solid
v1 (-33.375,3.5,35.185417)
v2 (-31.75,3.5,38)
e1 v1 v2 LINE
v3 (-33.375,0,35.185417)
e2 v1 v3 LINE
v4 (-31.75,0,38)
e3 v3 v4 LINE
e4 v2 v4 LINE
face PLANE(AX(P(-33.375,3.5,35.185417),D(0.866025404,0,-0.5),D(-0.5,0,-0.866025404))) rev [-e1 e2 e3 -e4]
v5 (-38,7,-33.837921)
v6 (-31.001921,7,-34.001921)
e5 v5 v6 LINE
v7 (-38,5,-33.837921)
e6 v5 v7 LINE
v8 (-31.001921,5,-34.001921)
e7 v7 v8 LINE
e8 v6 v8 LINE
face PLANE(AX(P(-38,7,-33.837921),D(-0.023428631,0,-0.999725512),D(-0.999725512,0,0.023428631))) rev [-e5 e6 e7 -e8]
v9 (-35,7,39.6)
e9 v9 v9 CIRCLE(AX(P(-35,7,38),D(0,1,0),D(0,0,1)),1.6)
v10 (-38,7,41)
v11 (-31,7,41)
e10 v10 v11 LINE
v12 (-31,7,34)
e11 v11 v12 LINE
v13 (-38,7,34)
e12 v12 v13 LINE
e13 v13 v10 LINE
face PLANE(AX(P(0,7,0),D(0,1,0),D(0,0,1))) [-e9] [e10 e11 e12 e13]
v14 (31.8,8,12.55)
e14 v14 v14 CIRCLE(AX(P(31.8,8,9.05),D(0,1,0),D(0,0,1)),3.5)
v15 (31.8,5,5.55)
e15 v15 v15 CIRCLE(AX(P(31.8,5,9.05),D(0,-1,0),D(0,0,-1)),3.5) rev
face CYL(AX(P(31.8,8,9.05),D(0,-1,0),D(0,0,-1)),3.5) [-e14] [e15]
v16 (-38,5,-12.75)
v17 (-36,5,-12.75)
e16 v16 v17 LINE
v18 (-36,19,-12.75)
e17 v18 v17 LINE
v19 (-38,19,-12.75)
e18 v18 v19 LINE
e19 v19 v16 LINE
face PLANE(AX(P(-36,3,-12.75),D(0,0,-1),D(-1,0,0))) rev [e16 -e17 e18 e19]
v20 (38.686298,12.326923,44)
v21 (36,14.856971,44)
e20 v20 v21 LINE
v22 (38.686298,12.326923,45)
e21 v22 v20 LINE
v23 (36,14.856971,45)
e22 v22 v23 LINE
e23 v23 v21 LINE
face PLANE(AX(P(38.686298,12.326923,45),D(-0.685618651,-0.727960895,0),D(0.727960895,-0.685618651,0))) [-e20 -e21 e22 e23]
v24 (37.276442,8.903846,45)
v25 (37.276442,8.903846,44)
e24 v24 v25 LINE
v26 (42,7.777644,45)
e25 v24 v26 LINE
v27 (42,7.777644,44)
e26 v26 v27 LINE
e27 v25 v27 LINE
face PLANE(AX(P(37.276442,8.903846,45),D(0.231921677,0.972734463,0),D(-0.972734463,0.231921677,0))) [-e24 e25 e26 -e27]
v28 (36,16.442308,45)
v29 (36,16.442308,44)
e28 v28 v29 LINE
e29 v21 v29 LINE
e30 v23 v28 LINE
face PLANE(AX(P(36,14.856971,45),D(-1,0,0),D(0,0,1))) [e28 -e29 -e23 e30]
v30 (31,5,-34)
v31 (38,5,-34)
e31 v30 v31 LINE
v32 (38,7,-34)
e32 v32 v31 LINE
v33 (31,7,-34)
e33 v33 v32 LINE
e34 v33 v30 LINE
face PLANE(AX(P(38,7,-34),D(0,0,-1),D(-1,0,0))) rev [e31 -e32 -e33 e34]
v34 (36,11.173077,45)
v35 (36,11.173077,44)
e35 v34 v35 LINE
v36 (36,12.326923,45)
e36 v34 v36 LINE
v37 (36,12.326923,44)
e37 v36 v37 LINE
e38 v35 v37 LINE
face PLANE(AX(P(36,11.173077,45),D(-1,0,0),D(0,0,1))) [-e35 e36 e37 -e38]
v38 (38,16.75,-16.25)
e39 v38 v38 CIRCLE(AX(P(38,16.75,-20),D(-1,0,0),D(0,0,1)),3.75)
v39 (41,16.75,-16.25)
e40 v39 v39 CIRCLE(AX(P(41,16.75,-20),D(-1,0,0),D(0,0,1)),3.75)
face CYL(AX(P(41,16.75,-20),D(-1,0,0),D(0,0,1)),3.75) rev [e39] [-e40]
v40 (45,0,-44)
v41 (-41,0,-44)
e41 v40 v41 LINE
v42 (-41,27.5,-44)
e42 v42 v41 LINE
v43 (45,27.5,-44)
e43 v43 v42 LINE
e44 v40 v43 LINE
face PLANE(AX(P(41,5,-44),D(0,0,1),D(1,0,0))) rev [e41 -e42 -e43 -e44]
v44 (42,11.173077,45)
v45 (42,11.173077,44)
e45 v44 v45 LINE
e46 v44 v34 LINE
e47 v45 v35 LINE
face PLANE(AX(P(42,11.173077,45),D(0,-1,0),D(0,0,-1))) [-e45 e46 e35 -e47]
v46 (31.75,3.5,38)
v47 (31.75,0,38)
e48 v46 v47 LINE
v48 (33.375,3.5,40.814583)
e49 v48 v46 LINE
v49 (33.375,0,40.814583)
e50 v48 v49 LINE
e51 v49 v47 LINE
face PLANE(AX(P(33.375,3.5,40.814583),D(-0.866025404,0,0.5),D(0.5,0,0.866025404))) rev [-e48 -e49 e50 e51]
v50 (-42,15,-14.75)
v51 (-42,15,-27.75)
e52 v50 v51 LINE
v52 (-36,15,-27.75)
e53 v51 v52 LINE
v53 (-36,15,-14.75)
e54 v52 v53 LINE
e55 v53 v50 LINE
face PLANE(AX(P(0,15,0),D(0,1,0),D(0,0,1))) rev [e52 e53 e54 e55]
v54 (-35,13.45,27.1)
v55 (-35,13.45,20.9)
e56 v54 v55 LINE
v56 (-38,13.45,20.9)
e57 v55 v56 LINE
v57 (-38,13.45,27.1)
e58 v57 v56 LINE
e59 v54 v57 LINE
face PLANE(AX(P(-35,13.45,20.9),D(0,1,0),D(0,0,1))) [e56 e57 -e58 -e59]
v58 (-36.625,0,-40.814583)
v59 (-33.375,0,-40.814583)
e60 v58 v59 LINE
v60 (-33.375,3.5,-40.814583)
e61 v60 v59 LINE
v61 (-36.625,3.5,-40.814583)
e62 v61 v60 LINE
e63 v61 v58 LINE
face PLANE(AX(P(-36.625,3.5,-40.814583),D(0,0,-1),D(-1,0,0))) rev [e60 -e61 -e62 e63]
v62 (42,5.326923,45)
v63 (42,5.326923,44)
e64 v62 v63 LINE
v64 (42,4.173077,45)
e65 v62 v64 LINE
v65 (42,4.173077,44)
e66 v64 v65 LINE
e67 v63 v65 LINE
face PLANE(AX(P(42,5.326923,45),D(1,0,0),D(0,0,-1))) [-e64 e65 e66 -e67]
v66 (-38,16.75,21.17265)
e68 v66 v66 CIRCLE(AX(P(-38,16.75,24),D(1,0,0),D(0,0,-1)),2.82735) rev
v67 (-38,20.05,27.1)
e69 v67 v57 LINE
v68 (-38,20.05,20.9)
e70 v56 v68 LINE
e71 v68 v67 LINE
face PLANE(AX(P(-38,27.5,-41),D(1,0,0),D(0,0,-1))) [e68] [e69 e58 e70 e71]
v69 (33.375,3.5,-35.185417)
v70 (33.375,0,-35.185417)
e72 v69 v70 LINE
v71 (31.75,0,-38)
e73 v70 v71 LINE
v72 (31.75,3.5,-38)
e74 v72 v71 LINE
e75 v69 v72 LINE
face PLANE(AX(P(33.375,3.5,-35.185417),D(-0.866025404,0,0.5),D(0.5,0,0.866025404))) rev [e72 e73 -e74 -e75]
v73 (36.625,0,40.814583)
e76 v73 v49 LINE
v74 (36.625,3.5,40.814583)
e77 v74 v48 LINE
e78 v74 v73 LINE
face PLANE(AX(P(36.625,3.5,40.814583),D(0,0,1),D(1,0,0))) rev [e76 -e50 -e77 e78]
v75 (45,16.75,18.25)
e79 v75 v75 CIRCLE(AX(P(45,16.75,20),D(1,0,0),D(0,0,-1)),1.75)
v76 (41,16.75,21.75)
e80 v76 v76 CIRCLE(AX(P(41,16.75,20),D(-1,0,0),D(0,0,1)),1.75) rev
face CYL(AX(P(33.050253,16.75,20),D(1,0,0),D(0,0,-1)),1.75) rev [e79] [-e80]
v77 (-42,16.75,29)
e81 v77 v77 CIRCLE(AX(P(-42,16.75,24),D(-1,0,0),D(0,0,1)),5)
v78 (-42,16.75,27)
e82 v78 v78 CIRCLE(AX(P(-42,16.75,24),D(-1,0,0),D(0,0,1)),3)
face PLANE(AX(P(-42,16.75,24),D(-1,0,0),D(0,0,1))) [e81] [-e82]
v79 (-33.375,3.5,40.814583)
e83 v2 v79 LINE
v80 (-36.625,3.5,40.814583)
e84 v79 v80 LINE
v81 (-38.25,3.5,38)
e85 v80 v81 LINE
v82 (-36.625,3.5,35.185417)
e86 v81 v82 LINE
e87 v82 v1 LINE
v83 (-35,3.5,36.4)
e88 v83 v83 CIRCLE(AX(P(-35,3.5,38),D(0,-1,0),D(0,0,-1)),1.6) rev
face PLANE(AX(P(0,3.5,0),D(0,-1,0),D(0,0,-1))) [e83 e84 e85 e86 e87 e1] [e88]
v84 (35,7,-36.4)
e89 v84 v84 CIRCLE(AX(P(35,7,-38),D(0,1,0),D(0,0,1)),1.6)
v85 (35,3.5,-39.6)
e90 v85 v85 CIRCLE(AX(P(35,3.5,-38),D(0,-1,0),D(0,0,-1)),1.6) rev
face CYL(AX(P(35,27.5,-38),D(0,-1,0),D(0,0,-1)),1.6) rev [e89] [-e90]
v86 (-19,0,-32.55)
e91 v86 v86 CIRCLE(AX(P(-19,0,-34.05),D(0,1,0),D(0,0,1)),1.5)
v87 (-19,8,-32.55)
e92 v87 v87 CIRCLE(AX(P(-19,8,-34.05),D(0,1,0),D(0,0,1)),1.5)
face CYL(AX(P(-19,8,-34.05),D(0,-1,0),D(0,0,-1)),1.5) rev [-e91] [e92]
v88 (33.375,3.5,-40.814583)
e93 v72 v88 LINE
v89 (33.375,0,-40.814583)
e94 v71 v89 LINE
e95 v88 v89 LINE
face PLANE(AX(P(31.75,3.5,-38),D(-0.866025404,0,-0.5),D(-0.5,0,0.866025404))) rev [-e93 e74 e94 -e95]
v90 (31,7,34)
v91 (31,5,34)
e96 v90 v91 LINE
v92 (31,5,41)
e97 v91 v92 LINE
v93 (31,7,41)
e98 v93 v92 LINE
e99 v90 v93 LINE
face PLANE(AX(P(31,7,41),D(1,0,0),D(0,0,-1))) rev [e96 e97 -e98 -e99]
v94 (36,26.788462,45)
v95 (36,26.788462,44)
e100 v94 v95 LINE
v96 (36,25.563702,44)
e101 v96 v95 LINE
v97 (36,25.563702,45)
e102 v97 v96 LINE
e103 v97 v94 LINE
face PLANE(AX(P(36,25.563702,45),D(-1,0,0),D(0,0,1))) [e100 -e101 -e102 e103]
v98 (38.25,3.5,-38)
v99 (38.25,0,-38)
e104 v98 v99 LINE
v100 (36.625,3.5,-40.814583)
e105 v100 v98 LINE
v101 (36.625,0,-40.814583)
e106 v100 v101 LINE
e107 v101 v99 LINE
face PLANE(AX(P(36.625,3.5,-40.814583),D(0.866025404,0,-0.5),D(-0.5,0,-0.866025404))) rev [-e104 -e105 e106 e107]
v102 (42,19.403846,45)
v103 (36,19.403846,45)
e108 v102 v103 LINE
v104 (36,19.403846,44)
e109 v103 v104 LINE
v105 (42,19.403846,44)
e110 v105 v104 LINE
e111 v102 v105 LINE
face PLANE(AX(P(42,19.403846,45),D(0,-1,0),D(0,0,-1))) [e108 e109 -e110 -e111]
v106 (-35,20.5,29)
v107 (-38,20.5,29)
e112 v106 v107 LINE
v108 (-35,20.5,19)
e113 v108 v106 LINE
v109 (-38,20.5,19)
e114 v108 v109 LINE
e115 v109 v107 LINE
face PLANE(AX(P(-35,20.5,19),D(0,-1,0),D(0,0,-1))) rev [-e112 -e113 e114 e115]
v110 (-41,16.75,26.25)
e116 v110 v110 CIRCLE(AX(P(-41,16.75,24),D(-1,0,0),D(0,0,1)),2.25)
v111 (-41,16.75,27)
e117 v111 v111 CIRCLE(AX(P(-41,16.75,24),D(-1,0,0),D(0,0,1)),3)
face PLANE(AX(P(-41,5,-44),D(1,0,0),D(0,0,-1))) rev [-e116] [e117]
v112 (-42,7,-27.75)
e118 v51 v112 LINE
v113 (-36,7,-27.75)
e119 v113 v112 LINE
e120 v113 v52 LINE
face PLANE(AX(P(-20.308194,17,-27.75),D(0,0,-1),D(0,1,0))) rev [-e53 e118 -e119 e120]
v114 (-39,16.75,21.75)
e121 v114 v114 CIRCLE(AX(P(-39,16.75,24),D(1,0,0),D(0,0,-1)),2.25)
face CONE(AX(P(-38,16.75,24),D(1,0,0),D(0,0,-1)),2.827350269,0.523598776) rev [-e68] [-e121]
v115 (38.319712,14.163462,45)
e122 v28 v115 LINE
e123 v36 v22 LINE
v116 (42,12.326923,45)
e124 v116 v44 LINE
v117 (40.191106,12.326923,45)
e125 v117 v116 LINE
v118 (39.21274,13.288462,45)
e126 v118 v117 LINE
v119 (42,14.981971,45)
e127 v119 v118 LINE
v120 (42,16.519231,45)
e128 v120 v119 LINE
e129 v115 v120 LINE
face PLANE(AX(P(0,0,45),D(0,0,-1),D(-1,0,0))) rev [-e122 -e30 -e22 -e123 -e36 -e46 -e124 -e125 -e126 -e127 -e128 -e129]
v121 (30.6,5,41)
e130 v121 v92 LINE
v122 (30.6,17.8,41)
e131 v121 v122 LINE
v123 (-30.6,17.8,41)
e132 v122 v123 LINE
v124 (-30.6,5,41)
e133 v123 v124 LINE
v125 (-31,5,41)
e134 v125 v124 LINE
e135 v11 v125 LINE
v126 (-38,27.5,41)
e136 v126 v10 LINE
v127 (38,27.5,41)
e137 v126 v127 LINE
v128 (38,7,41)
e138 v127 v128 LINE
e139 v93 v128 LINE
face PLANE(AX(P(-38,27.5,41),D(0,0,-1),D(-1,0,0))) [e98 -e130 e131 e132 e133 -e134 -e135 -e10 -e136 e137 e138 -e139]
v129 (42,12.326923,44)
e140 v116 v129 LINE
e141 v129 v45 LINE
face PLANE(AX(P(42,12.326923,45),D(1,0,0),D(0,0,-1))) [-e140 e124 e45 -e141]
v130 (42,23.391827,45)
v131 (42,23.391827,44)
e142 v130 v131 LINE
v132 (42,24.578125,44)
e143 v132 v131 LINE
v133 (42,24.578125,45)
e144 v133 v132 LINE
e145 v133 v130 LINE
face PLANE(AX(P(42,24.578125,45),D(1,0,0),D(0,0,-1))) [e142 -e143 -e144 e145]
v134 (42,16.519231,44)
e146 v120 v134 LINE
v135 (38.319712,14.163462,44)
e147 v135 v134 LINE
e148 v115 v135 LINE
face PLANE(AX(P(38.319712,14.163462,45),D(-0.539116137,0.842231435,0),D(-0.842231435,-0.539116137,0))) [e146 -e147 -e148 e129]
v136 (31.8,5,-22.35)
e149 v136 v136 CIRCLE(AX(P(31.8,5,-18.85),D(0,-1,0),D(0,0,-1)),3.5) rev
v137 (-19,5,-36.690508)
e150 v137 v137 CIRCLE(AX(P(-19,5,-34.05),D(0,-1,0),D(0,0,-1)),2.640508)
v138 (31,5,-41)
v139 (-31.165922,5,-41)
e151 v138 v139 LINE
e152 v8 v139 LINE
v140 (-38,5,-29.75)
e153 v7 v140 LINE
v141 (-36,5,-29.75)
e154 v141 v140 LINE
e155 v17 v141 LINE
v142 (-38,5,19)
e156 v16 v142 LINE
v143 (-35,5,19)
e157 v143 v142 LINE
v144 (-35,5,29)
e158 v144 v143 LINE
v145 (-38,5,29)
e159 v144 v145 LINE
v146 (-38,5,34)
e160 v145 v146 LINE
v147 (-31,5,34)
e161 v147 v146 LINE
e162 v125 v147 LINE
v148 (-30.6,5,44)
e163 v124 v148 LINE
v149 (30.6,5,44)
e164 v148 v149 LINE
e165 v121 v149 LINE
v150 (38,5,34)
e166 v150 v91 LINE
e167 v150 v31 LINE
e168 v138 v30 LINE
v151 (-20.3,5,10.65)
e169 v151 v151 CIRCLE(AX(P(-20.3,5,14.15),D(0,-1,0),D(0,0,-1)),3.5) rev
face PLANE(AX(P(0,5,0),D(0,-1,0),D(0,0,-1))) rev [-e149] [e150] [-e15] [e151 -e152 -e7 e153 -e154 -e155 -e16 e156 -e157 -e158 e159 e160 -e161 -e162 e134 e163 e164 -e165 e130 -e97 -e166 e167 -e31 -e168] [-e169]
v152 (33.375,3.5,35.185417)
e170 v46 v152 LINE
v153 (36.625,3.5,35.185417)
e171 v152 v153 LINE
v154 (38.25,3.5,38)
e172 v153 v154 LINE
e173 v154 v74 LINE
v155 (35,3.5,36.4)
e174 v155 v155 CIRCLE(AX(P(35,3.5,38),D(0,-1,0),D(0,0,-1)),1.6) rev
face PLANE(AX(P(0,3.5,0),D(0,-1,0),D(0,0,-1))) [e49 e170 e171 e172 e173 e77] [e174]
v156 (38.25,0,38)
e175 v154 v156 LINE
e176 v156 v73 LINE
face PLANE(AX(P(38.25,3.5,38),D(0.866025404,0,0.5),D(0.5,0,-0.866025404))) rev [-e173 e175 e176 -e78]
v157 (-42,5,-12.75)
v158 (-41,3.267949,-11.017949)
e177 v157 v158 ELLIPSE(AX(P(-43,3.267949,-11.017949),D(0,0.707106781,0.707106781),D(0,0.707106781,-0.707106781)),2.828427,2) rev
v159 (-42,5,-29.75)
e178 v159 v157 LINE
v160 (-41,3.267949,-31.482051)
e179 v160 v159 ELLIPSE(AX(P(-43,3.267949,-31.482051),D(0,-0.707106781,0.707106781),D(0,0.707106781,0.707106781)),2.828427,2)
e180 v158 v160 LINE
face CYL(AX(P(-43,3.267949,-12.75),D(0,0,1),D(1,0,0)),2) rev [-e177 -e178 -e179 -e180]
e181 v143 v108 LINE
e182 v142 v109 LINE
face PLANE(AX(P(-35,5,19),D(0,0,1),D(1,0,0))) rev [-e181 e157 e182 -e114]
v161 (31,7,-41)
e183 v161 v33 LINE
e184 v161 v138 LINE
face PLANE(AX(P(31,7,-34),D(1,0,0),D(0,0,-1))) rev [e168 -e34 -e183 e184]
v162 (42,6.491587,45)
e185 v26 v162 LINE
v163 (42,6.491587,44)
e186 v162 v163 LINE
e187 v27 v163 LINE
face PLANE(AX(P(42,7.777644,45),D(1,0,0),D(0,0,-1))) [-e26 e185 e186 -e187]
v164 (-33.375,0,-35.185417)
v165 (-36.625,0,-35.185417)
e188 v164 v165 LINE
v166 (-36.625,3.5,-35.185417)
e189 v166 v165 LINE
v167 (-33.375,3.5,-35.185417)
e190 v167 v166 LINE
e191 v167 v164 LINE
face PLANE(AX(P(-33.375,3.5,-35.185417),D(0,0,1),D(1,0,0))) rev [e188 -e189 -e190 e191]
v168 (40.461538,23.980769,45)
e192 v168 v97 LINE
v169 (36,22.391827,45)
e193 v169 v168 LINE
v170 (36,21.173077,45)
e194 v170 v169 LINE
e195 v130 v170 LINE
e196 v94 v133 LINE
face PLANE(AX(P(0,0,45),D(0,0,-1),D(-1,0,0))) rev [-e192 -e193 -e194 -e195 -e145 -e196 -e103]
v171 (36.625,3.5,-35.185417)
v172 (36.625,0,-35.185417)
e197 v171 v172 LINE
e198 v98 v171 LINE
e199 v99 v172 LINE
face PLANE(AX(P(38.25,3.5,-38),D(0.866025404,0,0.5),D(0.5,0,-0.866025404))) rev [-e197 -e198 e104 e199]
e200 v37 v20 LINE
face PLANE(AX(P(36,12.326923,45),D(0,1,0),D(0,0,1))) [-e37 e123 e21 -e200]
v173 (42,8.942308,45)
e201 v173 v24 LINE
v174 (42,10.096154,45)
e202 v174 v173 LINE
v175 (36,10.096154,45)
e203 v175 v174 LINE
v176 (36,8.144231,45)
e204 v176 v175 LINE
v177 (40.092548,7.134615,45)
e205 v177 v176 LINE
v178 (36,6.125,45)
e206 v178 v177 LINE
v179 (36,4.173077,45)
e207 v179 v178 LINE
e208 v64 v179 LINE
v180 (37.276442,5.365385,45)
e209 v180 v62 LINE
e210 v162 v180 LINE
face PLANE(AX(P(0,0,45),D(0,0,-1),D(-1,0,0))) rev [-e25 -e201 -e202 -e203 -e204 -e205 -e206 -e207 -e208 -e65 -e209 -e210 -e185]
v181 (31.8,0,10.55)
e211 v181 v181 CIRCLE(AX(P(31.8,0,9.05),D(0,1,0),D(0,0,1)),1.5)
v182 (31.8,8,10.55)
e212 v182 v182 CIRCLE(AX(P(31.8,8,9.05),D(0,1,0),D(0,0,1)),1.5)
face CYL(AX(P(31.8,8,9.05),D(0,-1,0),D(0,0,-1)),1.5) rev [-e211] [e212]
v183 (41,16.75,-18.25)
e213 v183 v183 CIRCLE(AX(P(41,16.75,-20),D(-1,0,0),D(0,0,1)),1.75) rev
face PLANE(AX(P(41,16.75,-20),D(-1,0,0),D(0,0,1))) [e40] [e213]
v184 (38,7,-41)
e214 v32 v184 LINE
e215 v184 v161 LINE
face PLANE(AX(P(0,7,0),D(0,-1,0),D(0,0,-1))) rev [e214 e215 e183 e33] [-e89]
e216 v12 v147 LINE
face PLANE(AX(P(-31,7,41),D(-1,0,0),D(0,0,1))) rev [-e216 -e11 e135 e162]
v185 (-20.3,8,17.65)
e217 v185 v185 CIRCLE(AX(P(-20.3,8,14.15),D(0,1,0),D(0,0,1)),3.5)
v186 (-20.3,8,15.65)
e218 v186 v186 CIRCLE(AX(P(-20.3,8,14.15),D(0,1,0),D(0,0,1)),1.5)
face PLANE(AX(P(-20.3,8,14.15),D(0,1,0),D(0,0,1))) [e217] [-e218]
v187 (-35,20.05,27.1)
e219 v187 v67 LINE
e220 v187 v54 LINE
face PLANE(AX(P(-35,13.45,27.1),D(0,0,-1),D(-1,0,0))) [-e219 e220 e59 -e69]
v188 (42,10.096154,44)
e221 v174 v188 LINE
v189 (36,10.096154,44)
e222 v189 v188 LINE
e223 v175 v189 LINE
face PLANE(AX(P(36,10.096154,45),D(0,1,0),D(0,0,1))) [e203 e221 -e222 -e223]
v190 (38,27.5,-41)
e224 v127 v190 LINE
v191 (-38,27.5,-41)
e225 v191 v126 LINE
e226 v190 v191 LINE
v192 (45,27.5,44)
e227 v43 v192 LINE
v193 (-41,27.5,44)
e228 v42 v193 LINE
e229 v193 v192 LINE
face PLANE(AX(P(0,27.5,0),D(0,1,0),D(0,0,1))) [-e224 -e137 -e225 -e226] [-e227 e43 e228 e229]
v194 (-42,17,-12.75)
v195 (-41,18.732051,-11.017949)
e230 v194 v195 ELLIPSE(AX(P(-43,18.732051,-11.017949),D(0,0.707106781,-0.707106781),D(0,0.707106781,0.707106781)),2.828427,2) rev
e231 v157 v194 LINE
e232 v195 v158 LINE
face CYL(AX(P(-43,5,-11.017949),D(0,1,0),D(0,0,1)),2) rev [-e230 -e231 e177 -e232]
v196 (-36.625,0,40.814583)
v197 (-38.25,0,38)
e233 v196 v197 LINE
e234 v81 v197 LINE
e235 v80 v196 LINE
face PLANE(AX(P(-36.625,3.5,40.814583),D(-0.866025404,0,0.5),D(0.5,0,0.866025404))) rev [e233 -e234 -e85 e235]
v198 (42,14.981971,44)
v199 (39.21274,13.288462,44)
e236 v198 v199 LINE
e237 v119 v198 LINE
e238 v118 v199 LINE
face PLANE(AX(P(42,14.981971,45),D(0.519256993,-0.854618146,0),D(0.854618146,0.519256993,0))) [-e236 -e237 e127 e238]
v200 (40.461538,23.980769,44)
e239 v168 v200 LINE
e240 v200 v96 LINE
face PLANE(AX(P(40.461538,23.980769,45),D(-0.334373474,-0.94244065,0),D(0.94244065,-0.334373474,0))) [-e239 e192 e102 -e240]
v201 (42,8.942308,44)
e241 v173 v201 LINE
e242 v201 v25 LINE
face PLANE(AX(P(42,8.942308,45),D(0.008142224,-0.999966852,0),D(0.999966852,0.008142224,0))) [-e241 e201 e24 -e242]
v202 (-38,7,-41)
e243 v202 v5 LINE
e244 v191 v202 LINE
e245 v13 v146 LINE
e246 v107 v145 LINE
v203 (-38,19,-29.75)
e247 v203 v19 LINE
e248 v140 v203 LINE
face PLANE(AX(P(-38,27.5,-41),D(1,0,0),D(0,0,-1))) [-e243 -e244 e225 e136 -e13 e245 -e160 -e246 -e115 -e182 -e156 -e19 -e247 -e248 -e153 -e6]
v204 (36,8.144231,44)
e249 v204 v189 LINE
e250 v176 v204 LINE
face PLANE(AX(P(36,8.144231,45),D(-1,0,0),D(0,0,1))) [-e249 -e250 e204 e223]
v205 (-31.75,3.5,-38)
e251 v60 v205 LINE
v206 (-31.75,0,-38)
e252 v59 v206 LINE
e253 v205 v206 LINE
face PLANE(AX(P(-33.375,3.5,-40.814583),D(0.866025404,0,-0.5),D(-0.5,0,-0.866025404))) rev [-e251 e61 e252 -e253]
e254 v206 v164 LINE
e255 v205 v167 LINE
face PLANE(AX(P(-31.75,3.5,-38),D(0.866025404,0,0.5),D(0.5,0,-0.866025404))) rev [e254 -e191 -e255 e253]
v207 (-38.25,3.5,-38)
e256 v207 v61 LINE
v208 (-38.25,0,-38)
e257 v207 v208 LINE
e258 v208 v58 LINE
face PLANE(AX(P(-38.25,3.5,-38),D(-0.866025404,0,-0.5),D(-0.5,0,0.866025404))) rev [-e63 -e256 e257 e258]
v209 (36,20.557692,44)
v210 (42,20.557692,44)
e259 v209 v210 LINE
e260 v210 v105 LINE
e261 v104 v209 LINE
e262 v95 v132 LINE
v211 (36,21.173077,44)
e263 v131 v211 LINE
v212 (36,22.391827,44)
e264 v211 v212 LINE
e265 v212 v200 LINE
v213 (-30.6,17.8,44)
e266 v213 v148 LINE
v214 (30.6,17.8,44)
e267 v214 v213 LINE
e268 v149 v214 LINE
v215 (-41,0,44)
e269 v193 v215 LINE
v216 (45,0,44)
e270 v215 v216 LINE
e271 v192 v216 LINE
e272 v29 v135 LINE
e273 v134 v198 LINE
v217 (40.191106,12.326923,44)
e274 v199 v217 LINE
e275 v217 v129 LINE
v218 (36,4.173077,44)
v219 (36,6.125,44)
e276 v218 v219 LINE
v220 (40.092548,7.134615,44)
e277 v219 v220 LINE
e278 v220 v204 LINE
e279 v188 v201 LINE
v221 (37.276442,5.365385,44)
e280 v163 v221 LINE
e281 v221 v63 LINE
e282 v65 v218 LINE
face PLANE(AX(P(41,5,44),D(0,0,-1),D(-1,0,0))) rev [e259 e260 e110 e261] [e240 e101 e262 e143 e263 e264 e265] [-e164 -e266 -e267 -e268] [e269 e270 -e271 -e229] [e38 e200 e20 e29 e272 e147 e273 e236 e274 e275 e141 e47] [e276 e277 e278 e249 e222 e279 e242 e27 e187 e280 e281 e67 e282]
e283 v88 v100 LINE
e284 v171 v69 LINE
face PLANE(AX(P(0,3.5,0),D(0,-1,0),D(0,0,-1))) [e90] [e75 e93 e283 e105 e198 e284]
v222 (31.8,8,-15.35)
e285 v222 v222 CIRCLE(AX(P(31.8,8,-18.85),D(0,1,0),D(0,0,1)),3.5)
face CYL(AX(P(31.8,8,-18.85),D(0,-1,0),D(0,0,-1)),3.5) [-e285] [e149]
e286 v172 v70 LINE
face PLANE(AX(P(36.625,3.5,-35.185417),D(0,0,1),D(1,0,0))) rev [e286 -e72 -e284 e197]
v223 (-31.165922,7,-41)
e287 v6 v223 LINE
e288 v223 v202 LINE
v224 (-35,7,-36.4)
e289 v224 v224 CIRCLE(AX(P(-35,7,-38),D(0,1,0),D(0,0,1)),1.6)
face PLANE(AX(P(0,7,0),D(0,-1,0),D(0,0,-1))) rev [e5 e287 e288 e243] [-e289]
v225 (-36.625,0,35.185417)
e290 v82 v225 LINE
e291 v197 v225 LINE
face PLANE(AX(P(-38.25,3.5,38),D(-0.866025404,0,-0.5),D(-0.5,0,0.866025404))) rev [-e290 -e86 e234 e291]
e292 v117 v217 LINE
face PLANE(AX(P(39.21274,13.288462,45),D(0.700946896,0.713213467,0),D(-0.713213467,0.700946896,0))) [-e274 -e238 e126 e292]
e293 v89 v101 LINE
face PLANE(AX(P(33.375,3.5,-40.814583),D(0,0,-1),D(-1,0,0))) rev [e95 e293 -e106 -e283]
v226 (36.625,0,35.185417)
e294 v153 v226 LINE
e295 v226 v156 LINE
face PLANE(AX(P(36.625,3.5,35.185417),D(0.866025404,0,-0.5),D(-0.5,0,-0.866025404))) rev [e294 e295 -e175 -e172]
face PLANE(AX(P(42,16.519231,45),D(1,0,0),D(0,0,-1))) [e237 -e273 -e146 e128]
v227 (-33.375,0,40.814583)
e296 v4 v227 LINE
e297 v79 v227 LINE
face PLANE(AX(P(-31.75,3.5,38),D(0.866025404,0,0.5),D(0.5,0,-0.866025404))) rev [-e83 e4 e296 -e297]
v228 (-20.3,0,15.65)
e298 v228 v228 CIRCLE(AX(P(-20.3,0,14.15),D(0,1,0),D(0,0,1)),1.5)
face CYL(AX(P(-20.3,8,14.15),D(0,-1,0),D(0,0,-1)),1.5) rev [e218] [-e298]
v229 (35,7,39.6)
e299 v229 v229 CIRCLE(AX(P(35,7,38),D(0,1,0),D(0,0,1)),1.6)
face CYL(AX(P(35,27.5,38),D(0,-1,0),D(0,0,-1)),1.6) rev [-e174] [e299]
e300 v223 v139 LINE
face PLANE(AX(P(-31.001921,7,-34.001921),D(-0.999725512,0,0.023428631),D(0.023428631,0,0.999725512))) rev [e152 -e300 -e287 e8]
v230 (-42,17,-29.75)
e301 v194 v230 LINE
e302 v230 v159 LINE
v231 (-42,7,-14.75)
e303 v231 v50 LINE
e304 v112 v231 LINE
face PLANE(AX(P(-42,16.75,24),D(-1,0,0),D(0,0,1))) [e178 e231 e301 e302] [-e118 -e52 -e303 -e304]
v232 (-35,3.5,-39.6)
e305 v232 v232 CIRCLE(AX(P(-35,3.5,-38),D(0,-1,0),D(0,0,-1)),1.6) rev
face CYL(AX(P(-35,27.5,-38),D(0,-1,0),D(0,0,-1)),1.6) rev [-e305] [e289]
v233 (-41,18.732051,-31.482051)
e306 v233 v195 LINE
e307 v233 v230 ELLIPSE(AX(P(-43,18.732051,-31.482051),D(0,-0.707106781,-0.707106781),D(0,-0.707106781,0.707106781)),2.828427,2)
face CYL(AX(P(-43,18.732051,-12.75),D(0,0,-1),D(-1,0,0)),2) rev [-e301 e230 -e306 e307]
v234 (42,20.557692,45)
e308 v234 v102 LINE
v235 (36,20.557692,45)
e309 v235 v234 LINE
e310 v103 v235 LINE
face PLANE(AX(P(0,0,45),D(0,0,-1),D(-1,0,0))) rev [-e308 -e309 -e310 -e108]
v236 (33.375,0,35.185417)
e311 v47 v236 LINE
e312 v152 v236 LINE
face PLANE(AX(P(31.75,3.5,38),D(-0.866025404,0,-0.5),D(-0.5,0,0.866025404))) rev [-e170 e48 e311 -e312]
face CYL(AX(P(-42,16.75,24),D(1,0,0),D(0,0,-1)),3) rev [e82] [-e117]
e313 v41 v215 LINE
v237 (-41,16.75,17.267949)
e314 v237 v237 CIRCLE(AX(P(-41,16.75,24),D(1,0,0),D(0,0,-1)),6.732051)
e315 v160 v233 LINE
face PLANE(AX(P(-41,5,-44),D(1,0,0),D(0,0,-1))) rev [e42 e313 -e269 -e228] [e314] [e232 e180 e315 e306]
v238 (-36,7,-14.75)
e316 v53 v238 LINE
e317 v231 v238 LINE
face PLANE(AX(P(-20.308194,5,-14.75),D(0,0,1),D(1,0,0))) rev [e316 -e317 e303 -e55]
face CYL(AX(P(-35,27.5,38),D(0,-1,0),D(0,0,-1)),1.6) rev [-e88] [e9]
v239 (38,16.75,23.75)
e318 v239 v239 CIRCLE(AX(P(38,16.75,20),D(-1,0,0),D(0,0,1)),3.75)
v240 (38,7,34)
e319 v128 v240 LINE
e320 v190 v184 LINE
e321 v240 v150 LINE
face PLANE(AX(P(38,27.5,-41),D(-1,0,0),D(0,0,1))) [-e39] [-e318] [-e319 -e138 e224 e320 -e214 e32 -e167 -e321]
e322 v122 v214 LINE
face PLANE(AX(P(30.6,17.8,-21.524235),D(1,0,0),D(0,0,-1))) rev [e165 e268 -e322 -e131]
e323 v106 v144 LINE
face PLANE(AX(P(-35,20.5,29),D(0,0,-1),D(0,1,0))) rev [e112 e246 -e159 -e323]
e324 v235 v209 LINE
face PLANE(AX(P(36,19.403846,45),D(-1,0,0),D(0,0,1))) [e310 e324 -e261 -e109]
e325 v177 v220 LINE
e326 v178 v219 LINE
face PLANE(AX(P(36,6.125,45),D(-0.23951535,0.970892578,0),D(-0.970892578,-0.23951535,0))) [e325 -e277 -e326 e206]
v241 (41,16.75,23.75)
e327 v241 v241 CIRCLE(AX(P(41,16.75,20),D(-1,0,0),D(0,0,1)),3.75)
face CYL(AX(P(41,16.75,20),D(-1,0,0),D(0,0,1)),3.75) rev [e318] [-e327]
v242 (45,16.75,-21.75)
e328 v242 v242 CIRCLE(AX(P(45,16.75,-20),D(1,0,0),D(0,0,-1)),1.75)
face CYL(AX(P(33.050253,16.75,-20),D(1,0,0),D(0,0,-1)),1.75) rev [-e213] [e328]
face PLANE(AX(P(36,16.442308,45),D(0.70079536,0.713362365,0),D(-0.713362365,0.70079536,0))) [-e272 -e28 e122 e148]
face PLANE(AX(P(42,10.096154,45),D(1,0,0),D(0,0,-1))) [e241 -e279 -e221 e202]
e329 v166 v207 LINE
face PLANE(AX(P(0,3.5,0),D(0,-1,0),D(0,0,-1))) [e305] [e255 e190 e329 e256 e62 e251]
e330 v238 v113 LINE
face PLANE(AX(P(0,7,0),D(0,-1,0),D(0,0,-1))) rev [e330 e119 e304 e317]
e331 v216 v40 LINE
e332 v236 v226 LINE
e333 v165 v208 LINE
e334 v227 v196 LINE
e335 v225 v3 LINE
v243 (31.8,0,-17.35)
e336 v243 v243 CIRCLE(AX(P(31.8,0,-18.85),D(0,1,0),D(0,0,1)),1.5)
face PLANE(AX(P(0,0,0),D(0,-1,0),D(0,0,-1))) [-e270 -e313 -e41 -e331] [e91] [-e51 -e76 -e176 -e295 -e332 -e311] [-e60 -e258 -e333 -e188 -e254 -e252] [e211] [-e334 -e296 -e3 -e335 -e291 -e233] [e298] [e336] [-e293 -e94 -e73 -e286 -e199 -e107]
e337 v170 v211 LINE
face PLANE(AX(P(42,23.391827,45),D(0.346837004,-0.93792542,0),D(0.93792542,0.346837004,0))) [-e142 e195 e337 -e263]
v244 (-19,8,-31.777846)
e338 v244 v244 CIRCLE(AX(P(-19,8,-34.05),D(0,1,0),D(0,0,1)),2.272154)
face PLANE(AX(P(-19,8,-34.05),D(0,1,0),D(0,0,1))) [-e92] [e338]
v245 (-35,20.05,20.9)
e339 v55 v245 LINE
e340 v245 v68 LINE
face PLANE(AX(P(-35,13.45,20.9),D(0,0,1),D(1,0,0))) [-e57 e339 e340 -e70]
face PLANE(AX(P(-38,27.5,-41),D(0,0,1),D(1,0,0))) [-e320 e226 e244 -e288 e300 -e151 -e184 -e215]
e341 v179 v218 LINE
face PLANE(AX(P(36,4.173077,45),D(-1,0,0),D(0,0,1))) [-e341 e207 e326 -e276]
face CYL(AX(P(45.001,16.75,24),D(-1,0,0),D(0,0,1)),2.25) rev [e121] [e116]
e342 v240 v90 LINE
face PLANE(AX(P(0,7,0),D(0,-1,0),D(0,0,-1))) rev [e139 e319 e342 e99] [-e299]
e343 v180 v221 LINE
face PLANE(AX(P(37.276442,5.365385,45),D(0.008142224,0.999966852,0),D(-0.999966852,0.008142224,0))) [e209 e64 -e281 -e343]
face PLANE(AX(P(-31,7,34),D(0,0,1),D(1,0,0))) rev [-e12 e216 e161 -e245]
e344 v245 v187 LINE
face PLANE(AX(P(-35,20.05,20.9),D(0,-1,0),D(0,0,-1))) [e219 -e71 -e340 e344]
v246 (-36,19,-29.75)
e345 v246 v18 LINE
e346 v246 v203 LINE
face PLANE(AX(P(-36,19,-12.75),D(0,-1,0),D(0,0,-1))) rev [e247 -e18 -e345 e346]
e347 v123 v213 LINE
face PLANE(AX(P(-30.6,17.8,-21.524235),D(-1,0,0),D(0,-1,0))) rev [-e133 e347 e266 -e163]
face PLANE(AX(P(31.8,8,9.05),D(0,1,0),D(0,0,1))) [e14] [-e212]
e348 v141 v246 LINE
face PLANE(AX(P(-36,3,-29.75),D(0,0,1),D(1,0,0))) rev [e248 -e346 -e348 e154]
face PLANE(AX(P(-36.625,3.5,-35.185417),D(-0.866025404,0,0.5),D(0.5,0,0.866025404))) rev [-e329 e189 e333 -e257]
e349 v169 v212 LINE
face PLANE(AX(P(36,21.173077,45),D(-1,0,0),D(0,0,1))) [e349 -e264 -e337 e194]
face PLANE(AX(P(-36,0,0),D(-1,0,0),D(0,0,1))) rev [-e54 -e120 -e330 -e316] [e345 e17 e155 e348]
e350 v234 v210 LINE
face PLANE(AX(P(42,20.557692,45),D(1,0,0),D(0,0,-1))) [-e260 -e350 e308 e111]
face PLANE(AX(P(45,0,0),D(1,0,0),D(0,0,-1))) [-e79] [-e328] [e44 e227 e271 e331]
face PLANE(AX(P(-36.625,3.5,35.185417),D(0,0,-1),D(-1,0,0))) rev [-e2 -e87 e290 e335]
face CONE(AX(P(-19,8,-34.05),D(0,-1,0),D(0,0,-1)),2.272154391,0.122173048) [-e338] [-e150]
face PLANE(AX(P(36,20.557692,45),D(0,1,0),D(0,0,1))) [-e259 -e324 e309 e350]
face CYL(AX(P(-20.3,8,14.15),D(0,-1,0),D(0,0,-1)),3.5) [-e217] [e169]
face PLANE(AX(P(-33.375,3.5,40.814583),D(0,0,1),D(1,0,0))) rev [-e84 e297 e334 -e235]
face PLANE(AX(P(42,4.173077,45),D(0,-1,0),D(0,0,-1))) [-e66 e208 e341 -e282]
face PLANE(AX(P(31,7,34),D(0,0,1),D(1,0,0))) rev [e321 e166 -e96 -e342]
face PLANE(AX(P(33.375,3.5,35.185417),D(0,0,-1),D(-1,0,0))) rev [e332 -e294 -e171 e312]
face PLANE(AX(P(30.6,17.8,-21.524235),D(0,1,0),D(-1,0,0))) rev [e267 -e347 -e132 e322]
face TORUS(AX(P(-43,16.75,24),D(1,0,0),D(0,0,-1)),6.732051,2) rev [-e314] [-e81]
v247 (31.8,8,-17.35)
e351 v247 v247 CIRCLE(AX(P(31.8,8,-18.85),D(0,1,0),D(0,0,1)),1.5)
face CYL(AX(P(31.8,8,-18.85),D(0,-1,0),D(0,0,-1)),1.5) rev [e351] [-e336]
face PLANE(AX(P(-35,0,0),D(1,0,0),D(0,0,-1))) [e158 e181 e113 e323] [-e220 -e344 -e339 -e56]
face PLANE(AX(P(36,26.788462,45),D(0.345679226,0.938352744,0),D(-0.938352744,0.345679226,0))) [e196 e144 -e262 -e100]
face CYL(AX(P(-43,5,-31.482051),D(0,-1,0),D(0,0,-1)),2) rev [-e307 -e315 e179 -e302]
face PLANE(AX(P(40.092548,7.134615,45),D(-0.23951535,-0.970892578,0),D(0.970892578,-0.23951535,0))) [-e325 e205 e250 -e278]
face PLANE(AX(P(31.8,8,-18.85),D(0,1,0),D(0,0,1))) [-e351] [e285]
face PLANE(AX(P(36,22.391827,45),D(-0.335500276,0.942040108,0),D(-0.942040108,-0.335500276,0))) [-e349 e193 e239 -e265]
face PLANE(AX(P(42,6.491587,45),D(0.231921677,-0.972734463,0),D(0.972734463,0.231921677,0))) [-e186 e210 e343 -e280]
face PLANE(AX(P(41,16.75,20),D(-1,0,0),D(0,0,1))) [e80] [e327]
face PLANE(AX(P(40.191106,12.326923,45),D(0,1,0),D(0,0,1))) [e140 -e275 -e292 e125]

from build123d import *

# Parameters (mm, degrees)
SKETCH1_W            = 82
SKETCH1_H            = 88
BOSS_EXTRUDE1_DEPTH  = 5
SKETCH2_W            = 82
SKETCH2_H            = 88
SKETCH2_W_2          = 76
SKETCH2_H_2          = 82
BOSS_EXTRUDE2_DEPTH  = 22.5
SKETCH_1_R           = 3.5
SKETCH_1_R_2         = 1.5
BOSS_EXTRUDE3_DEPTH  = 3
SKETCH4_W            = 13
SKETCH4_H            = 12
CUT_EXTRUDE1_DEPTH   = 3
SKETCH7_R            = 1.6
CUT_EXTRUDE3_DEPTH   = 67.130552697
CUT_EXTRUDE4_DEPTH   = 3.5
SKETCH10_W           = 17
SKETCH10_H           = 16
SKETCH10_W_2         = 13
SKETCH10_H_2         = 12
BOSS_EXTRUDE6_DEPTH  = 2
CHAMFER1_SIZE        = 10
CHAMFER1_SIZE_2      = 1.227845609
SKETCH11_R           = 1.5
CUT_EXTRUDE5_DEPTH   = 65.212537717
SKETCH12_W           = 61.2
SKETCH12_H           = 12.8
CUT_EXTRUDE6_DEPTH   = 3
SKETCH13_R           = 1.75
CUT_EXTRUDE7_DEPTH   = 3
BOSS_EXTRUDE7_START  = 4
SKETCH14_W           = 88
SKETCH14_H           = 27.5
SKETCH14_R           = 1.75
BOSS_EXTRUDE7_DEPTH  = 4
SKETCH15_R           = 3.75
CUT_EXTRUDE8_DEPTH   = 3
CUT_EXTRUDE9_REACH   = 102.44
SKETCH16_R           = 2.25
SKETCH17_W           = 10
SKETCH17_H           = 15.5
SKETCH17_W_2         = 6.2
SKETCH17_H_2         = 6.6
BOSS_EXTRUDE8_DEPTH  = 3
CHAMFER2_SIZE        = 1
CHAMFER2_SIZE2       = 0.577350269
SKETCH20_R           = 5
SKETCH20_R_2         = 3
BOSS_EXTRUDE10_DEPTH = 1
FILLET3_R            = 2
SKETCH21_W           = 5
SKETCH21_H           = 13
BOSS_EXTRUDE11_DEPTH = 2
SKETCH22_W           = 6
SKETCH22_H           = 1.153846154
BOSS_EXTRUDE12_DEPTH = 1
SKETCH27_W           = 5
SKETCH27_H           = 13
BOSS_EXTRUDE17_DEPTH = 2
SKETCH23_W           = 7
SKETCH23_H           = 7
SKETCH23_R           = 1.6
BOSS_EXTRUDE13_DEPTH = 2
SKETCH25_W           = 17
SKETCH25_H           = 12
SKETCH25_W_2         = 13
SKETCH25_H_2         = 8
BOSS_EXTRUDE15_DEPTH = 1
FILLET4_R            = 2


with BuildPart() as part:
    # Sketch1 → Boss-Extrude1 (new body)
    with BuildSketch(Plane(origin=(0, 0, 0), x_dir=(1, 0, 0), z_dir=(0, 1, 0))):
        Rectangle(SKETCH1_W, SKETCH1_H)
    extrude(amount=BOSS_EXTRUDE1_DEPTH)

    # Sketch2 → Boss-Extrude2 (add)
    with BuildSketch(Plane(origin=(0, 5, 0), x_dir=(1, 0, 0), z_dir=(0, 1, 0))):
        Rectangle(SKETCH2_W, SKETCH2_H)
        Rectangle(SKETCH2_W_2, SKETCH2_H_2, mode=Mode.SUBTRACT)
    extrude(amount=BOSS_EXTRUDE2_DEPTH)

    # Эскиз1 → Boss-Extrude3 (add)
    # profile 1 of 4: a face of its own
    with BuildSketch(Plane(origin=(0, 5, 0), x_dir=(1, 0, 0), z_dir=(0, 1, 0))):
        with Locations(Location((-20.3, -14.15, 0), (0, 0, 90))):
            Circle(SKETCH_1_R)
        with Locations(Location((-20.3, -14.15, 0), (0, 0, 270))):
            Circle(SKETCH_1_R_2, mode=Mode.SUBTRACT)
    # profile 2 of 4: a face of its own
    with BuildSketch(Plane(origin=(0, 5, 0), x_dir=(1, 0, 0), z_dir=(0, 1, 0))):
        with Locations(Location((-19, 34.05, 0), (0, 0, 90))):
            Circle(SKETCH_1_R)
        with Locations(Location((-19, 34.05, 0), (0, 0, 270))):
            Circle(SKETCH_1_R_2, mode=Mode.SUBTRACT)
    # profile 3 of 4: a face of its own
    with BuildSketch(Plane(origin=(0, 5, 0), x_dir=(1, 0, 0), z_dir=(0, 1, 0))):
        with Locations(Location((31.8, 18.85, 0), (0, 0, 90))):
            Circle(SKETCH_1_R)
        with Locations(Location((31.8, 18.85, 0), (0, 0, 270))):
            Circle(SKETCH_1_R_2, mode=Mode.SUBTRACT)
    # profile 4 of 4: a face of its own
    with BuildSketch(Plane(origin=(0, 5, 0), x_dir=(1, 0, 0), z_dir=(0, 1, 0))):
        with Locations(Location((31.8, -9.05, 0), (0, 0, 90))):
            Circle(SKETCH_1_R)
        with Locations(Location((31.8, -9.05, 0), (0, 0, 270))):
            Circle(SKETCH_1_R_2, mode=Mode.SUBTRACT)
    extrude(amount=BOSS_EXTRUDE3_DEPTH)

    # Sketch4 → Cut-Extrude1 (cut)
    with BuildSketch(Plane.ZY.offset(41)):
        with Locations((-21.25, 11)):
            Rectangle(SKETCH4_W, SKETCH4_H)
    extrude(amount=-CUT_EXTRUDE1_DEPTH, mode=Mode.SUBTRACT)

    # Sketch7 → Cut-Extrude3 (cut, through all)
    with BuildSketch(Plane.XZ):
        with Locations(Location((35, -38, 0), (0, 0, 270))):
            Circle(SKETCH7_R)
        with Locations(Location((-35, -38, 0), (0, 0, 270))):
            Circle(SKETCH7_R)
        with Locations(Location((-35, 38, 0), (0, 0, 270))):
            Circle(SKETCH7_R)
        with Locations(Location((35, 38, 0), (0, 0, 270))):
            Circle(SKETCH7_R)
    extrude(amount=-CUT_EXTRUDE3_DEPTH, mode=Mode.SUBTRACT)

    # Sketch8 → Cut-Extrude4 (cut)
    with BuildSketch(Plane.XZ):
        Polygon((33.375, 35.185417438), (36.625, 35.185417438), (38.25, 38), (36.625, 40.814582562), (33.375, 40.814582562), (31.75, 38), align=None)
        Polygon((33.375, -35.185417438), (31.75, -38), (33.375, -40.814582562), (36.625, -40.814582562), (38.25, -38), (36.625, -35.185417438), align=None)
        Polygon((-36.625, -35.185417438), (-38.25, -38), (-36.625, -40.814582562), (-33.375, -40.814582562), (-31.75, -38), (-33.375, -35.185417438), align=None)
        Polygon((-36.625, 35.185417438), (-33.375, 35.185417438), (-31.75, 38), (-33.375, 40.814582562), (-36.625, 40.814582562), (-38.25, 38), align=None)
    extrude(amount=-CUT_EXTRUDE4_DEPTH, mode=Mode.SUBTRACT)

    # Sketch10 → Boss-Extrude6 (add)
    with BuildSketch(Plane(origin=(-38, 0, 0), x_dir=(0, 0, -1), z_dir=(1, 0, 0))):
        with Locations((21.25, 11)):
            Rectangle(SKETCH10_W, SKETCH10_H)
        with Locations((21.25, 11)):
            Rectangle(SKETCH10_W_2, SKETCH10_H_2, mode=Mode.SUBTRACT)
    extrude(amount=BOSS_EXTRUDE6_DEPTH)

    # Chamfer1
    # the kernel refuses this chamfer: 10, 1.227845609 mm, written as the material it takes off along each edge
    with BuildSketch(Plane(origin=(-19, 8, -34.05), x_dir=(0, 0, -1), z_dir=(1, 0, 0))) as chamfer1_piece_1_section:
        Polygon((3.5, -CHAMFER1_SIZE), (3.5 - CHAMFER1_SIZE_2, 0), (3.5, 0), align=None)
    chamfer1_piece_1 = revolve(axis=Axis((-19, 8, -34.05), (0, 1, 0)), mode=Mode.PRIVATE)
    chamfer1_piece_1 = split(chamfer1_piece_1, bisect_by=Plane(origin=(-19, 5, -31.575672909), z_dir=(0, 1, 0)), keep=Keep.TOP, mode=Mode.PRIVATE)
    add(chamfer1_piece_1, mode=Mode.SUBTRACT)

    # Sketch11 → Cut-Extrude5 (cut, through all)
    with BuildSketch(Plane(origin=(0, 5, 0), x_dir=(1, 0, 0), z_dir=(0, 1, 0))):
        with Locations(Location((-20.3, -14.15, 0), (0, 0, 270))):
            Circle(SKETCH11_R)
        with Locations(Location((-19, 34.05, 0), (0, 0, 270))):
            Circle(SKETCH11_R)
        with Locations(Location((31.8, -9.05, 0), (0, 0, 270))):
            Circle(SKETCH11_R)
        with Locations(Location((31.8, 18.85, 0), (0, 0, 270))):
            Circle(SKETCH11_R)
    extrude(amount=-CUT_EXTRUDE5_DEPTH, mode=Mode.SUBTRACT)

    # Sketch12 → Cut-Extrude6 (cut)
    with BuildSketch(Plane.XY.offset(44)):
        with Locations((0, 11.4)):
            Rectangle(SKETCH12_W, SKETCH12_H)
    extrude(amount=-CUT_EXTRUDE6_DEPTH, mode=Mode.SUBTRACT)

    # Sketch13 → Cut-Extrude7 (cut)
    with BuildSketch(Plane(origin=(41, 0, 0), x_dir=(0, 0, -1), z_dir=(1, 0, 0))):
        with Locations((-20, 16.75)):
            Circle(SKETCH13_R)
        with Locations((20, 16.75)):
            Circle(SKETCH13_R)
    extrude(amount=-CUT_EXTRUDE7_DEPTH, mode=Mode.SUBTRACT)

    # Sketch14 → Boss-Extrude7 (add)
    with BuildSketch(Plane(origin=(41, 0, 0), x_dir=(0, 0, -1), z_dir=(1, 0, 0)).offset(BOSS_EXTRUDE7_START)):
        with Locations((0, 13.75)):
            Rectangle(SKETCH14_W, SKETCH14_H)
        with Locations((-20, 16.75)):
            Circle(SKETCH14_R, mode=Mode.SUBTRACT)
        with Locations((20, 16.75)):
            Circle(SKETCH14_R, mode=Mode.SUBTRACT)
    extrude(amount=-BOSS_EXTRUDE7_DEPTH)

    # Sketch15 → Cut-Extrude8 (cut)
    with BuildSketch(Plane.ZY.offset(-38)):
        with Locations((20, 16.75)):
            Circle(SKETCH15_R)
        with Locations((-20, 16.75)):
            Circle(SKETCH15_R)
    extrude(amount=-CUT_EXTRUDE8_DEPTH, mode=Mode.SUBTRACT)

    # Sketch16 → Cut-Extrude9 (cut, up to next)
    with BuildSketch(Plane.ZY.offset(41), mode=Mode.PRIVATE) as cut_extrude9_sk1:
        with Locations((24, 16.75)):
            Circle(SKETCH16_R)
    cut_extrude9_tool1 = extrude(cut_extrude9_sk1.sketch, amount=-CUT_EXTRUDE9_REACH, mode=Mode.PRIVATE) & part.part
    add(cut_extrude9_tool1.solids().sort_by_distance((-41, 16.75, 24))[0], mode=Mode.SUBTRACT)

    # Sketch17 → Boss-Extrude8 (add)
    with BuildSketch(Plane(origin=(-38, 0, 0), x_dir=(0, 0, -1), z_dir=(1, 0, 0))):
        with Locations((-24, 12.75)):
            Rectangle(SKETCH17_W, SKETCH17_H)
        with Locations((-24, 16.75)):
            Rectangle(SKETCH17_W_2, SKETCH17_H_2, mode=Mode.SUBTRACT)
    extrude(amount=BOSS_EXTRUDE8_DEPTH)

    # Chamfer2
    chamfer2_edges = [part.edges().sort_by_distance(p)[0] for p in [
        (-38, 16.75, 21.75),
    ]]
    chamfer2_side = [part.faces().sort_by_distance(p)[0] for p in [
        (-39.5, 16.75, 21.75),
    ]]
    chamfer(chamfer2_edges, length=CHAMFER2_SIZE, length2=CHAMFER2_SIZE2, reference=chamfer2_side[0])

    # Sketch20 → Boss-Extrude10 (add)
    with BuildSketch(Plane.ZY.offset(41)):
        with Locations(Location((24, 16.75, 0), (0, 0, 180))):
            Circle(SKETCH20_R)
        with Locations((24, 16.75)):
            Circle(SKETCH20_R_2, mode=Mode.SUBTRACT)
    extrude(amount=BOSS_EXTRUDE10_DEPTH)

    # Fillet3
    # the kernel refuses this fillet: 2 mm, written as the material it adds along each edge
    with BuildSketch(Plane(origin=(-41, 16.75, 24), x_dir=(0, 0, -1), z_dir=(0, 1, 0))) as fillet3_piece_1:
        with BuildLine():
            CenterArc((6.732050808, 2), FILLET3_R, 210, 60)
            Line((6.732050808, 0), (6.732050808, -0.04))
            Line((6.732050808, -0.04), (5, -0.04))
            Line((5, -0.04), (4.96, 0))
            ThreePointArc((4.96, 0), (4.96, 0.5), (4.965358984, 0.98))
            Line((4.965358984, 0.98), (5, 1))
        make_face()
    revolve(axis=Axis((-41, 16.75, 24), (-1, 0, 0)))

    # Sketch21 → Boss-Extrude11 (add)
    with BuildSketch(Plane(origin=(0, 5, 0), x_dir=(1, 0, 0), z_dir=(0, 1, 0))):
        with Locations((-38.5, 21.25)):
            Rectangle(SKETCH21_W, SKETCH21_H)
    extrude(amount=BOSS_EXTRUDE11_DEPTH)

    # Sketch22 → Boss-Extrude12 (add)
    with BuildSketch(Plane.XY.offset(44)):
        Polygon((42, 4.173076923), (36, 4.173076923), (36, 6.125), (40.092548077, 7.134615385), (36, 8.144230769), (36, 10.096153846), (42, 10.096153846), (42, 8.942307692), (37.276442308, 8.903846154), (42, 7.777644231), (42, 6.491586538), (37.276442308, 5.365384615), (42, 5.326923077), align=None)
        Polygon((42, 11.173076923), (36, 11.173076923), (36, 12.326923077), (38.686298077, 12.326923077), (36, 14.856971154), (36, 16.442307692), (38.319711538, 14.163461538), (42, 16.519230769), (42, 14.981971154), (39.212740385, 13.288461538), (40.191105769, 12.326923077), (42, 12.326923077), align=None)
        with Locations((39, 19.980769231)):
            Rectangle(SKETCH22_W, SKETCH22_H)
        Polygon((42, 23.391826923), (36, 21.173076923), (36, 22.391826923), (40.461538462, 23.980769231), (36, 25.563701923), (36, 26.788461538), (42, 24.578125), align=None)
    extrude(amount=BOSS_EXTRUDE12_DEPTH)

    # Sketch27 → Boss-Extrude17 (add)
    with BuildSketch(Plane.XZ.offset(-17)):
        with Locations((-38.5, -21.25)):
            Rectangle(SKETCH27_W, SKETCH27_H)
    extrude(amount=BOSS_EXTRUDE17_DEPTH)

    # Sketch23 → Boss-Extrude13 (add)
    # profile 1 of 4: a face of its own
    with BuildSketch(Plane(origin=(0, 5, 0), x_dir=(1, 0, 0), z_dir=(0, 1, 0))):
        with Locations((-34.5, -37.5)):
            Rectangle(SKETCH23_W, SKETCH23_H)
        with Locations(Location((-35, -38, 0), (0, 0, 90))):
            Circle(SKETCH23_R, mode=Mode.SUBTRACT)
    # profile 2 of 4: a face of its own
    with BuildSketch(Plane(origin=(0, 5, 0), x_dir=(1, 0, 0), z_dir=(0, 1, 0))):
        with Locations((34.5, -37.5)):
            Rectangle(SKETCH23_W, SKETCH23_H)
        with Locations(Location((35, -38, 0), (0, 0, 90))):
            Circle(SKETCH23_R, mode=Mode.SUBTRACT)
    # profile 3 of 4: a face of its own
    with BuildSketch(Plane(origin=(0, 5, 0), x_dir=(1, 0, 0), z_dir=(0, 1, 0))):
        with Locations((34.5, 37.5)):
            Rectangle(SKETCH23_W, SKETCH23_H)
        with Locations(Location((35, 38, 0), (0, 0, 90))):
            Circle(SKETCH23_R, mode=Mode.SUBTRACT)
    # profile 4 of 4: a face of its own
    with BuildSketch(Plane(origin=(0, 5, 0), x_dir=(1, 0, 0), z_dir=(0, 1, 0))):
        Polygon((-38, 33.837921002), (-31.001921416, 34.001921416), (-31.16592183, 41), (-38, 41), align=None)
        with Locations(Location((-35, 38, 0), (0, 0, 90))):
            Circle(SKETCH23_R, mode=Mode.SUBTRACT)
    extrude(amount=BOSS_EXTRUDE13_DEPTH)

    # Sketch25 → Boss-Extrude15 (add)
    with BuildSketch(Plane.ZY.offset(41)):
        with Locations((-21.25, 11)):
            Rectangle(SKETCH25_W, SKETCH25_H)
        with Locations((-21.25, 11)):
            Rectangle(SKETCH25_W_2, SKETCH25_H_2, mode=Mode.SUBTRACT)
    extrude(amount=BOSS_EXTRUDE15_DEPTH)

    # Fillet4
    # the kernel refuses this fillet: 2 mm, written as the material it adds along each edge
    with BuildSketch(Plane(origin=(-41, 17, -29.75), x_dir=(0, 1, 0), z_dir=(0, 0, 1)), Plane(origin=(-41, 5, -12.75), x_dir=(0, -1, 0), z_dir=(0, 0, -1))) as fillet4_piece_1:
        with BuildLine():
            CenterArc((1.732050808, 2), FILLET4_R, 210, 60)
            Line((0, 1), (-0.034641016, 0.98))
            ThreePointArc((-0.034641016, 0.98), (-0.04, 0.5), (-0.04, 0))
            Line((-0.04, 0), (0, -0.04))
            Line((0, -0.04), (1.732050808, -0.04))
            Line((1.732050808, -0.04), (1.732050808, 0))
        make_face()
    extrude(amount=17)
    with BuildSketch(Plane(origin=(-41, 5, -29.75), x_dir=(0, 0, -1), z_dir=(0, 1, 0)), Plane(origin=(-41, 17, -12.75), x_dir=(0, 0, 1), z_dir=(0, -1, 0))) as fillet4_piece_2:
        with BuildLine():
            CenterArc((1.732050808, 2), FILLET4_R, 210, 60)
            Line((0, 1), (-0.034641016, 0.98))
            ThreePointArc((-0.034641016, 0.98), (-0.04, 0.5), (-0.04, 0))
            Line((-0.04, 0), (0, -0.04))
            Line((0, -0.04), (1.732050808, -0.04))
            Line((1.732050808, -0.04), (1.732050808, 0))
        make_face()
    extrude(amount=12)
    with BuildSketch(Plane(origin=(-41, 5, -29.75), x_dir=(0, 0, -1), z_dir=(0, 1, 0))) as fillet4_piece_3a_section:
        with BuildLine():
            CenterArc((1.732050808, 2), FILLET4_R, 210, 60)
            Line((0, 1), (-0.034641016, 0.98))
            ThreePointArc((-0.034641016, 0.98), (-0.04, 0.5), (-0.04, 0))
            Line((-0.04, 0), (0, -0.04))
            Line((0, -0.04), (1.732050808, -0.04))
            Line((1.732050808, -0.04), (1.732050808, 0))
        make_face()
    fillet4_piece_3a = extrude(amount=16.330127019, mode=Mode.PRIVATE)
    fillet4_piece_3a = split(fillet4_piece_3a, bisect_by=Plane(origin=(-41.259033422, 17, -30.182620892), z_dir=(0, 1, 0)), keep=Keep.TOP, mode=Mode.PRIVATE)
    with BuildSketch(Plane(origin=(-41, 17, -34.080127019), x_dir=(0, 1, 0), z_dir=(0, 0, 1))) as fillet4_piece_3b_section:
        with BuildLine():
            CenterArc((1.732050808, 2), FILLET4_R, 210, 60)
            Line((0, 1), (-0.034641016, 0.98))
            ThreePointArc((-0.034641016, 0.98), (-0.04, 0.5), (-0.04, 0))
            Line((-0.04, 0), (0, -0.04))
            Line((0, -0.04), (1.732050808, -0.04))
            Line((1.732050808, -0.04), (1.732050808, 0))
        make_face()
    fillet4_piece_3b = extrude(amount=21.330127019, mode=Mode.PRIVATE)
    fillet4_piece_3b = split(fillet4_piece_3b, bisect_by=Plane(origin=(-41.259033422, 17.432620892, -29.75), z_dir=(0, 0, -1)), keep=Keep.TOP, mode=Mode.PRIVATE)
    fillet4_piece_3 = fillet4_piece_3a & fillet4_piece_3b
    add(fillet4_piece_3)
    with BuildSketch(Plane(origin=(-41, 17, -29.75), x_dir=(0, 1, 0), z_dir=(0, 0, 1))) as fillet4_piece_4a_section:
        with BuildLine():
            CenterArc((1.732050808, 2), FILLET4_R, 210, 60)
            Line((0, 1), (-0.034641016, 0.98))
            ThreePointArc((-0.034641016, 0.98), (-0.04, 0.5), (-0.04, 0))
            Line((-0.04, 0), (0, -0.04))
            Line((0, -0.04), (1.732050808, -0.04))
            Line((1.732050808, -0.04), (1.732050808, 0))
        make_face()
    fillet4_piece_4a = extrude(amount=21.330127019, mode=Mode.PRIVATE)
    fillet4_piece_4a = split(fillet4_piece_4a, bisect_by=Plane(origin=(-41.259033422, 17.432620892, -12.75), z_dir=(0, 0, 1)), keep=Keep.TOP, mode=Mode.PRIVATE)
    with BuildSketch(Plane(origin=(-41, 21.330127019, -12.75), x_dir=(0, 0, 1), z_dir=(0, -1, 0))) as fillet4_piece_4b_section:
        with BuildLine():
            CenterArc((1.732050808, 2), FILLET4_R, 210, 60)
            Line((0, 1), (-0.034641016, 0.98))
            ThreePointArc((-0.034641016, 0.98), (-0.04, 0.5), (-0.04, 0))
            Line((-0.04, 0), (0, -0.04))
            Line((0, -0.04), (1.732050808, -0.04))
            Line((1.732050808, -0.04), (1.732050808, 0))
        make_face()
    fillet4_piece_4b = extrude(amount=16.330127019, mode=Mode.PRIVATE)
    fillet4_piece_4b = split(fillet4_piece_4b, bisect_by=Plane(origin=(-41.259033422, 17, -12.317379108), z_dir=(0, 1, 0)), keep=Keep.TOP, mode=Mode.PRIVATE)
    fillet4_piece_4 = fillet4_piece_4a & fillet4_piece_4b
    add(fillet4_piece_4)
    with BuildSketch(Plane(origin=(-41, 5, -12.75), x_dir=(0, -1, 0), z_dir=(0, 0, -1))) as fillet4_piece_5a_section:
        with BuildLine():
            CenterArc((1.732050808, 2), FILLET4_R, 210, 60)
            Line((0, 1), (-0.034641016, 0.98))
            ThreePointArc((-0.034641016, 0.98), (-0.04, 0.5), (-0.04, 0))
            Line((-0.04, 0), (0, -0.04))
            Line((0, -0.04), (1.732050808, -0.04))
            Line((1.732050808, -0.04), (1.732050808, 0))
        make_face()
    fillet4_piece_5a = extrude(amount=21.330127019, mode=Mode.PRIVATE)
    fillet4_piece_5a = split(fillet4_piece_5a, bisect_by=Plane(origin=(-41.259033422, 4.567379108, -29.75), z_dir=(0, 0, -1)), keep=Keep.TOP, mode=Mode.PRIVATE)
    with BuildSketch(Plane(origin=(-41, 0.669872981, -29.75), x_dir=(0, 0, -1), z_dir=(0, 1, 0))) as fillet4_piece_5b_section:
        with BuildLine():
            CenterArc((1.732050808, 2), FILLET4_R, 210, 60)
            Line((0, 1), (-0.034641016, 0.98))
            ThreePointArc((-0.034641016, 0.98), (-0.04, 0.5), (-0.04, 0))
            Line((-0.04, 0), (0, -0.04))
            Line((0, -0.04), (1.732050808, -0.04))
            Line((1.732050808, -0.04), (1.732050808, 0))
        make_face()
    fillet4_piece_5b = extrude(amount=16.330127019, mode=Mode.PRIVATE)
    fillet4_piece_5b = split(fillet4_piece_5b, bisect_by=Plane(origin=(-41.259033422, 5, -30.182620892), z_dir=(0, -1, 0)), keep=Keep.TOP, mode=Mode.PRIVATE)
    fillet4_piece_5 = fillet4_piece_5a & fillet4_piece_5b
    add(fillet4_piece_5)
    with BuildSketch(Plane(origin=(-41, 5, -8.419872981), x_dir=(0, -1, 0), z_dir=(0, 0, -1))) as fillet4_piece_6a_section:
        with BuildLine():
            CenterArc((1.732050808, 2), FILLET4_R, 210, 60)
            Line((0, 1), (-0.034641016, 0.98))
            ThreePointArc((-0.034641016, 0.98), (-0.04, 0.5), (-0.04, 0))
            Line((-0.04, 0), (0, -0.04))
            Line((0, -0.04), (1.732050808, -0.04))
            Line((1.732050808, -0.04), (1.732050808, 0))
        make_face()
    fillet4_piece_6a = extrude(amount=21.330127019, mode=Mode.PRIVATE)
    fillet4_piece_6a = split(fillet4_piece_6a, bisect_by=Plane(origin=(-41.259033422, 4.567379108, -12.75), z_dir=(0, 0, 1)), keep=Keep.TOP, mode=Mode.PRIVATE)
    with BuildSketch(Plane(origin=(-41, 17, -12.75), x_dir=(0, 0, 1), z_dir=(0, -1, 0))) as fillet4_piece_6b_section:
        with BuildLine():
            CenterArc((1.732050808, 2), FILLET4_R, 210, 60)
            Line((0, 1), (-0.034641016, 0.98))
            ThreePointArc((-0.034641016, 0.98), (-0.04, 0.5), (-0.04, 0))
            Line((-0.04, 0), (0, -0.04))
            Line((0, -0.04), (1.732050808, -0.04))
            Line((1.732050808, -0.04), (1.732050808, 0))
        make_face()
    fillet4_piece_6b = extrude(amount=16.330127019, mode=Mode.PRIVATE)
    fillet4_piece_6b = split(fillet4_piece_6b, bisect_by=Plane(origin=(-41.259033422, 5, -12.317379108), z_dir=(0, -1, 0)), keep=Keep.TOP, mode=Mode.PRIVATE)
    fillet4_piece_6 = fillet4_piece_6a & fillet4_piece_6b
    add(fillet4_piece_6)


solid = part.part
